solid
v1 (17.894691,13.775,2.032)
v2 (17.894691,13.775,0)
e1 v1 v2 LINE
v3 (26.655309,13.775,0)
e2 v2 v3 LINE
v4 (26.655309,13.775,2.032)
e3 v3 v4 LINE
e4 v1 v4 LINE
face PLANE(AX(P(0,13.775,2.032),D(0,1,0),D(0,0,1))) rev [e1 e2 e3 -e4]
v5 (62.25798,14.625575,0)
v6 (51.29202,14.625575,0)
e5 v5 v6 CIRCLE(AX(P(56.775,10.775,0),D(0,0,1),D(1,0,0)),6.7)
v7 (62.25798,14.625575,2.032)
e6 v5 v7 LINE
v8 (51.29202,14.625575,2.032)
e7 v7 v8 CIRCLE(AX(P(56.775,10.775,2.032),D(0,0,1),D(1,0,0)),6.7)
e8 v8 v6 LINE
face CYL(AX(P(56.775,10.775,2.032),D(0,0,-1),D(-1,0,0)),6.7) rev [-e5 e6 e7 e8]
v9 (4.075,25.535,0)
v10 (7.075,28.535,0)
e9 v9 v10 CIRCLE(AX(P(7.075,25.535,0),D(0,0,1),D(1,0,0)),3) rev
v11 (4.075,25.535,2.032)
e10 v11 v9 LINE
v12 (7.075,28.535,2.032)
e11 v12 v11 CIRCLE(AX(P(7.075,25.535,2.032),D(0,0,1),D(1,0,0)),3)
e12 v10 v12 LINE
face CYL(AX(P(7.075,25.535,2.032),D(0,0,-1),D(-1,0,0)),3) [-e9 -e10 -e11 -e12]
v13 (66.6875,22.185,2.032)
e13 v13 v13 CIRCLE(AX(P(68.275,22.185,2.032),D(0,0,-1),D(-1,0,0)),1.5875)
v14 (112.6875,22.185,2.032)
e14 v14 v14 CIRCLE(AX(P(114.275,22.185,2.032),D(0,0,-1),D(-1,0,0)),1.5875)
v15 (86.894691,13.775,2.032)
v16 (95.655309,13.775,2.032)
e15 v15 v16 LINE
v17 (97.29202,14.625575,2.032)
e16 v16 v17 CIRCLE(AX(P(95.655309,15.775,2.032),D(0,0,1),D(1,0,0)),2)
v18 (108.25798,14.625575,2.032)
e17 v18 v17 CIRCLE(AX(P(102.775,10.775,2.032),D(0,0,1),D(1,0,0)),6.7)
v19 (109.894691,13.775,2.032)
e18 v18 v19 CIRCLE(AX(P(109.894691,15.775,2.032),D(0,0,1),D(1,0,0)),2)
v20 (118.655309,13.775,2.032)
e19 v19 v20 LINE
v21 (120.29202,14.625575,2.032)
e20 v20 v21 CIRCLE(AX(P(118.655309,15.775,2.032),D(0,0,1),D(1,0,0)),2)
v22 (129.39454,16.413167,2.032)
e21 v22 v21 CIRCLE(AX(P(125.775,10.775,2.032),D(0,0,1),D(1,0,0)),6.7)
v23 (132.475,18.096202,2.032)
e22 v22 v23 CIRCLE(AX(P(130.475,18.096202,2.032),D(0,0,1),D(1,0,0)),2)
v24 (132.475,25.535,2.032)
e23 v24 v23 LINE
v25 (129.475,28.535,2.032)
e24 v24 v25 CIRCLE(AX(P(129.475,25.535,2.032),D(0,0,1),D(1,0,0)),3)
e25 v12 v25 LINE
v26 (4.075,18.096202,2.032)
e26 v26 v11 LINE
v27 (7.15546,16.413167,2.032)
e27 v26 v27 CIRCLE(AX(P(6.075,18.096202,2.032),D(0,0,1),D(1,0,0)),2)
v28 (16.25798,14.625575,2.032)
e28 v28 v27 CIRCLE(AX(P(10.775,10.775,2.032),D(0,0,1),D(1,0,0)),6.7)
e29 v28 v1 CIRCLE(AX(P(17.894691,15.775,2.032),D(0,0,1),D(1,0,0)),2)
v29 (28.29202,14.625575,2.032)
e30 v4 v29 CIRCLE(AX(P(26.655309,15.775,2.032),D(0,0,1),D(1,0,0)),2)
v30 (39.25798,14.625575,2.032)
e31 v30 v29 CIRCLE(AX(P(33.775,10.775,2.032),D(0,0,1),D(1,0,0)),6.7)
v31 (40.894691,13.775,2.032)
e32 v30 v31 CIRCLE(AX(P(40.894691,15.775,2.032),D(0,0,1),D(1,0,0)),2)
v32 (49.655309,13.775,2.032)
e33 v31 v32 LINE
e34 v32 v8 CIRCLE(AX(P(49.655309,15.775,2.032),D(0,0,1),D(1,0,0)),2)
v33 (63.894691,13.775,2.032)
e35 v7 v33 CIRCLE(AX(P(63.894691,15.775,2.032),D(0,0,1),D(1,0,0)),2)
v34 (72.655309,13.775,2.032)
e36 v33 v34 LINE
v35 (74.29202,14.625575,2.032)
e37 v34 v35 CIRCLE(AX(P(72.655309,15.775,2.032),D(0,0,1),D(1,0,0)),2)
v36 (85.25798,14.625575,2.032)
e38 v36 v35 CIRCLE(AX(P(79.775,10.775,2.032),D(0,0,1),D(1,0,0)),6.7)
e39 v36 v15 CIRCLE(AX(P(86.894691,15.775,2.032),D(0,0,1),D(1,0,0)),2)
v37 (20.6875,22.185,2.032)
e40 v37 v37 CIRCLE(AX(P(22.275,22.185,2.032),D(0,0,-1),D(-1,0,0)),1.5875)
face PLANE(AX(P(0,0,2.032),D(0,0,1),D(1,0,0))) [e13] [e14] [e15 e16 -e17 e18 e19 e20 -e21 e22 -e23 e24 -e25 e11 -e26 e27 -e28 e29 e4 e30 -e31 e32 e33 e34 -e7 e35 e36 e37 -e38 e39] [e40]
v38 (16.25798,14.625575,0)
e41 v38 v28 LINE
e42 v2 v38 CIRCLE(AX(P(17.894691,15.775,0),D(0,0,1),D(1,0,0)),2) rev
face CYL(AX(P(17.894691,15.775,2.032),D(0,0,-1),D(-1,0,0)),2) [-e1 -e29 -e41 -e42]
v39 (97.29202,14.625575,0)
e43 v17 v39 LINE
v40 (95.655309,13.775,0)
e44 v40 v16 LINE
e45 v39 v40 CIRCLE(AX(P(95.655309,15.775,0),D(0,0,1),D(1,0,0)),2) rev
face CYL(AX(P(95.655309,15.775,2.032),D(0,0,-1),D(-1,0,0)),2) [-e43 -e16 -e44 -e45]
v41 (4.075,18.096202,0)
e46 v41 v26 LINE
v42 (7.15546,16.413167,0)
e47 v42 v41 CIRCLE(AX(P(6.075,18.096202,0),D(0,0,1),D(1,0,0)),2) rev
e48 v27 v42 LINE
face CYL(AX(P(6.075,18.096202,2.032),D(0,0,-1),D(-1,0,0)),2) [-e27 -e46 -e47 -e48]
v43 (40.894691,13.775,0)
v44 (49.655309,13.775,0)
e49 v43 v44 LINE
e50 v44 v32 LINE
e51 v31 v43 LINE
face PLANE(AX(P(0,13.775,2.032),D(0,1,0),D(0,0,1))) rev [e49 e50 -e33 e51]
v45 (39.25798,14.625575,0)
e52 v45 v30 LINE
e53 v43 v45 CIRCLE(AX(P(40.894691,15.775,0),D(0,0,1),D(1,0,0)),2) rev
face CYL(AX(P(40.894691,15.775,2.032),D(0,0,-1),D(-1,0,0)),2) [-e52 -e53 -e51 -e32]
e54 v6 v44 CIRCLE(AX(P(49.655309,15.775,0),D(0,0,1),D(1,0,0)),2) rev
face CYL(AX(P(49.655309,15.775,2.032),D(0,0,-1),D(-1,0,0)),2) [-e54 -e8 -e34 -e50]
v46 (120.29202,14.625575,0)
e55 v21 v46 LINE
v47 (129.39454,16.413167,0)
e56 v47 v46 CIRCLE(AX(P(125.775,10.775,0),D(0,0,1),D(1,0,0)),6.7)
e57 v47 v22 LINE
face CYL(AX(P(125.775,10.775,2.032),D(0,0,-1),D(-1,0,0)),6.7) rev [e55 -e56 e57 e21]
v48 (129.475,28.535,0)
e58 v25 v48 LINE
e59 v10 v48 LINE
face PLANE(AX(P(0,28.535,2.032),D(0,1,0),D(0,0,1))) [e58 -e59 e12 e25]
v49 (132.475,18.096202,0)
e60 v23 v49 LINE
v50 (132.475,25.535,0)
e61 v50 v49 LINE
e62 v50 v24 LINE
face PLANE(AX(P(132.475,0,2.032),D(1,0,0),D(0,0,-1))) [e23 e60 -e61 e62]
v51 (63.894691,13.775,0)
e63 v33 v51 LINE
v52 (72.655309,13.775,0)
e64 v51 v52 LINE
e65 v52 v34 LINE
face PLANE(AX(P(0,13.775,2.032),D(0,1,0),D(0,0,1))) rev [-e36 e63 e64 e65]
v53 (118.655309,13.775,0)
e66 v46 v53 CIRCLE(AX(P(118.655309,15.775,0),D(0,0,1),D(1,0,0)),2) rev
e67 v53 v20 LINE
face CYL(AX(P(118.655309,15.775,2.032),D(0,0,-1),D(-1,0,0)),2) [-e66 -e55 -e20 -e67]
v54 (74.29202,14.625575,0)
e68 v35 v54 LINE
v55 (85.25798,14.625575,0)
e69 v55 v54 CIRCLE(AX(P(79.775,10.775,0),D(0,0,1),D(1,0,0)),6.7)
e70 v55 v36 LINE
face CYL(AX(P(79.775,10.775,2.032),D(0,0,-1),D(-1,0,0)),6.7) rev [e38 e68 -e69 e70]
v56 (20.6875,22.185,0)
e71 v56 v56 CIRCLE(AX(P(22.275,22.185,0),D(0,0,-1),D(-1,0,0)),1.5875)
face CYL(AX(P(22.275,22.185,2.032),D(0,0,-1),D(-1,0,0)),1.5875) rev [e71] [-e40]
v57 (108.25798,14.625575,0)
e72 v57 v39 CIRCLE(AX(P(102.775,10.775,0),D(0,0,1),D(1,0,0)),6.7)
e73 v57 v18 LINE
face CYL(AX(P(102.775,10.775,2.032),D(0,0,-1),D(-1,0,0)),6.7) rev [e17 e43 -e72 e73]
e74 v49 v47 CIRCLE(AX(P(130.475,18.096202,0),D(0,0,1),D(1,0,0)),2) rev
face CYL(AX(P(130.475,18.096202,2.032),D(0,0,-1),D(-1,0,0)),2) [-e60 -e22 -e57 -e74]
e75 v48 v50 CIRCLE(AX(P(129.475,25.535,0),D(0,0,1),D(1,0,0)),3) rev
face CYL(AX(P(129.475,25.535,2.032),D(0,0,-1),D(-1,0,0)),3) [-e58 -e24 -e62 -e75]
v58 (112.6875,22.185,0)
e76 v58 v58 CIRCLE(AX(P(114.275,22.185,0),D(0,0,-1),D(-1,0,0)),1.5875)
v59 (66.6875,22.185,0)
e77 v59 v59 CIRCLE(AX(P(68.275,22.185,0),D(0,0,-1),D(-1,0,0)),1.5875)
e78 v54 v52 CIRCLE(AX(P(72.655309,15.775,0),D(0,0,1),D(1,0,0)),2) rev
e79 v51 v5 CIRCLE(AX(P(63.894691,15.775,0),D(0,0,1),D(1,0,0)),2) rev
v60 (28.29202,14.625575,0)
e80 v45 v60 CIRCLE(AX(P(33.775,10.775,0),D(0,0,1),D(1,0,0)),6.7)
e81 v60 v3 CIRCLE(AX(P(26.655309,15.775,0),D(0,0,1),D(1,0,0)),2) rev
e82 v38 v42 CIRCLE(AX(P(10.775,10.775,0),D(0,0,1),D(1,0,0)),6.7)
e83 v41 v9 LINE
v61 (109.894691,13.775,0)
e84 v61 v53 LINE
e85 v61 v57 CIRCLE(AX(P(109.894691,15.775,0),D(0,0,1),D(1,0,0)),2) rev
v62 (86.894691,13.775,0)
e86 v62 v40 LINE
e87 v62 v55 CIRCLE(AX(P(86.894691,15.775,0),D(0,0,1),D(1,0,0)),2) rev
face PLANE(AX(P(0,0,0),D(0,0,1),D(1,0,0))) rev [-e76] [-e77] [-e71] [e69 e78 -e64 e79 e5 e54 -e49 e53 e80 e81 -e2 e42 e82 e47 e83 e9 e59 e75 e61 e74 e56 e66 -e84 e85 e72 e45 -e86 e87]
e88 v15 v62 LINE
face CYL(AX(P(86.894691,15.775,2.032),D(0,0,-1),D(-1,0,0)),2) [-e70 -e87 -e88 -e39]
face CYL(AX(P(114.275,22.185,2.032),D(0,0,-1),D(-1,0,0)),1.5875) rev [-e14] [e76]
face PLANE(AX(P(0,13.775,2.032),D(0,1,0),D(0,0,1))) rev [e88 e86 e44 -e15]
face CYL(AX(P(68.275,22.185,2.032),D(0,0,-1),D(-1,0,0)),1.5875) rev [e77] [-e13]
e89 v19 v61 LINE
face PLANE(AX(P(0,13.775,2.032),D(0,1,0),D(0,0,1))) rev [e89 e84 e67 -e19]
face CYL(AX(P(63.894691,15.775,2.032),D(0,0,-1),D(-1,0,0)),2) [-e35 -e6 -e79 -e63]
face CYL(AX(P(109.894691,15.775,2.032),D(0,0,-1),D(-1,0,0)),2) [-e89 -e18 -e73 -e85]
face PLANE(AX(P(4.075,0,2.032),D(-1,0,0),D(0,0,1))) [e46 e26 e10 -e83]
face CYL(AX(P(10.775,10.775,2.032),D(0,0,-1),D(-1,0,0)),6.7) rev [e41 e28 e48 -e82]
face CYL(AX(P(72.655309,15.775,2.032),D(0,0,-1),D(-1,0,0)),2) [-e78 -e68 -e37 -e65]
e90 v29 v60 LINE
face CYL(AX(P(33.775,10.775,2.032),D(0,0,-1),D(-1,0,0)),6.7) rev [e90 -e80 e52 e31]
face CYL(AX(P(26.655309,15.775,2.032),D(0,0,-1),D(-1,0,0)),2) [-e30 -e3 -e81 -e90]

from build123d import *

# Parameters (mm, degrees)
BOSS_EXTRUDE1_DEPTH = 2.032
FILLET1_R           = 3
FILLET2_R           = 2
SKETCH4_R           = 1.5875
CUT_EXTRUDE1_DEPTH  = 136.528598113


with BuildPart() as part:
    # Sketch3 → Boss-Extrude1 (new body)
    with BuildSketch(Plane.XY):
        with BuildLine():
            ThreePointArc((4.075, 10.775), (9.233659082, 17.295296632), (16.76582632, 13.775))
            Line((16.76582632, 13.775), (27.78417368, 13.775))
            ThreePointArc((27.78417368, 13.775), (33.775, 17.475), (39.76582632, 13.775))
            Line((39.76582632, 13.775), (50.78417368, 13.775))
            ThreePointArc((50.78417368, 13.775), (56.775, 17.475), (62.76582632, 13.775))
            Line((62.76582632, 13.775), (73.78417368, 13.775))
            ThreePointArc((73.78417368, 13.775), (79.775, 17.475), (85.76582632, 13.775))
            Line((85.76582632, 13.775), (96.78417368, 13.775))
            ThreePointArc((96.78417368, 13.775), (102.775, 17.475), (108.76582632, 13.775))
            Line((108.76582632, 13.775), (119.78417368, 13.775))
            ThreePointArc((119.78417368, 13.775), (127.316340918, 17.295296632), (132.475, 10.775))
            Line((132.475, 10.775), (132.475, 28.535))
            Line((132.475, 28.535), (4.075, 28.535))
            Line((4.075, 28.535), (4.075, 10.775))
        make_face()
    extrude(amount=BOSS_EXTRUDE1_DEPTH)

    # Fillet1
    fillet1_edges = [part.edges().sort_by_distance(p)[0] for p in [
        (4.075, 28.535, 1.016),
        (132.475, 28.535, 1.016),
    ]]
    fillet(fillet1_edges, radius=FILLET1_R)

    # Fillet2
    fillet2_edges = [part.edges().sort_by_distance(p)[0] for p in [
        (119.78417368, 13.775, 1.016),
    ]]
    fillet(fillet2_edges, radius=FILLET2_R)
    fillet2_2_edges = [part.edges().sort_by_distance(p)[0] for p in [
        (108.76582632, 13.775, 1.016),
    ]]
    fillet(fillet2_2_edges, radius=FILLET2_R)
    fillet2_3_edges = [part.edges().sort_by_distance(p)[0] for p in [
        (96.78417368, 13.775, 1.016),
    ]]
    fillet(fillet2_3_edges, radius=FILLET2_R)
    fillet2_4_edges = [part.edges().sort_by_distance(p)[0] for p in [
        (4.075, 10.775, 1.016),
    ]]
    fillet(fillet2_4_edges, radius=FILLET2_R)
    fillet2_5_edges = [part.edges().sort_by_distance(p)[0] for p in [
        (85.76582632, 13.775, 1.016),
    ]]
    fillet(fillet2_5_edges, radius=FILLET2_R)
    fillet2_6_edges = [part.edges().sort_by_distance(p)[0] for p in [
        (16.76582632, 13.775, 1.016),
    ]]
    fillet(fillet2_6_edges, radius=FILLET2_R)
    fillet2_7_edges = [part.edges().sort_by_distance(p)[0] for p in [
        (73.78417368, 13.775, 1.016),
    ]]
    fillet(fillet2_7_edges, radius=FILLET2_R)
    fillet2_8_edges = [part.edges().sort_by_distance(p)[0] for p in [
        (27.78417368, 13.775, 1.016),
    ]]
    fillet(fillet2_8_edges, radius=FILLET2_R)
    fillet2_9_edges = [part.edges().sort_by_distance(p)[0] for p in [
        (62.76582632, 13.775, 1.016),
    ]]
    fillet(fillet2_9_edges, radius=FILLET2_R)
    fillet2_10_edges = [part.edges().sort_by_distance(p)[0] for p in [
        (39.76582632, 13.775, 1.016),
    ]]
    fillet(fillet2_10_edges, radius=FILLET2_R)
    fillet2_11_edges = [part.edges().sort_by_distance(p)[0] for p in [
        (50.78417368, 13.775, 1.016),
    ]]
    fillet(fillet2_11_edges, radius=FILLET2_R)
    fillet2_12_edges = [part.edges().sort_by_distance(p)[0] for p in [
        (132.475, 10.775, 1.016),
    ]]
    fillet(fillet2_12_edges, radius=FILLET2_R)

    # Sketch4 → Cut-Extrude1 (cut, through all)
    with BuildSketch(Plane(origin=(0, 0, 0), x_dir=(-1, 0, 0), z_dir=(0, 0, -1))):
        with Locations((-22.275, 22.185)):
            Circle(SKETCH4_R)
        with Locations((-68.275, 22.185)):
            Circle(SKETCH4_R)
        with Locations((-114.275, 22.185)):
            Circle(SKETCH4_R)
    extrude(amount=-CUT_EXTRUDE1_DEPTH, mode=Mode.SUBTRACT)


solid = part.part
